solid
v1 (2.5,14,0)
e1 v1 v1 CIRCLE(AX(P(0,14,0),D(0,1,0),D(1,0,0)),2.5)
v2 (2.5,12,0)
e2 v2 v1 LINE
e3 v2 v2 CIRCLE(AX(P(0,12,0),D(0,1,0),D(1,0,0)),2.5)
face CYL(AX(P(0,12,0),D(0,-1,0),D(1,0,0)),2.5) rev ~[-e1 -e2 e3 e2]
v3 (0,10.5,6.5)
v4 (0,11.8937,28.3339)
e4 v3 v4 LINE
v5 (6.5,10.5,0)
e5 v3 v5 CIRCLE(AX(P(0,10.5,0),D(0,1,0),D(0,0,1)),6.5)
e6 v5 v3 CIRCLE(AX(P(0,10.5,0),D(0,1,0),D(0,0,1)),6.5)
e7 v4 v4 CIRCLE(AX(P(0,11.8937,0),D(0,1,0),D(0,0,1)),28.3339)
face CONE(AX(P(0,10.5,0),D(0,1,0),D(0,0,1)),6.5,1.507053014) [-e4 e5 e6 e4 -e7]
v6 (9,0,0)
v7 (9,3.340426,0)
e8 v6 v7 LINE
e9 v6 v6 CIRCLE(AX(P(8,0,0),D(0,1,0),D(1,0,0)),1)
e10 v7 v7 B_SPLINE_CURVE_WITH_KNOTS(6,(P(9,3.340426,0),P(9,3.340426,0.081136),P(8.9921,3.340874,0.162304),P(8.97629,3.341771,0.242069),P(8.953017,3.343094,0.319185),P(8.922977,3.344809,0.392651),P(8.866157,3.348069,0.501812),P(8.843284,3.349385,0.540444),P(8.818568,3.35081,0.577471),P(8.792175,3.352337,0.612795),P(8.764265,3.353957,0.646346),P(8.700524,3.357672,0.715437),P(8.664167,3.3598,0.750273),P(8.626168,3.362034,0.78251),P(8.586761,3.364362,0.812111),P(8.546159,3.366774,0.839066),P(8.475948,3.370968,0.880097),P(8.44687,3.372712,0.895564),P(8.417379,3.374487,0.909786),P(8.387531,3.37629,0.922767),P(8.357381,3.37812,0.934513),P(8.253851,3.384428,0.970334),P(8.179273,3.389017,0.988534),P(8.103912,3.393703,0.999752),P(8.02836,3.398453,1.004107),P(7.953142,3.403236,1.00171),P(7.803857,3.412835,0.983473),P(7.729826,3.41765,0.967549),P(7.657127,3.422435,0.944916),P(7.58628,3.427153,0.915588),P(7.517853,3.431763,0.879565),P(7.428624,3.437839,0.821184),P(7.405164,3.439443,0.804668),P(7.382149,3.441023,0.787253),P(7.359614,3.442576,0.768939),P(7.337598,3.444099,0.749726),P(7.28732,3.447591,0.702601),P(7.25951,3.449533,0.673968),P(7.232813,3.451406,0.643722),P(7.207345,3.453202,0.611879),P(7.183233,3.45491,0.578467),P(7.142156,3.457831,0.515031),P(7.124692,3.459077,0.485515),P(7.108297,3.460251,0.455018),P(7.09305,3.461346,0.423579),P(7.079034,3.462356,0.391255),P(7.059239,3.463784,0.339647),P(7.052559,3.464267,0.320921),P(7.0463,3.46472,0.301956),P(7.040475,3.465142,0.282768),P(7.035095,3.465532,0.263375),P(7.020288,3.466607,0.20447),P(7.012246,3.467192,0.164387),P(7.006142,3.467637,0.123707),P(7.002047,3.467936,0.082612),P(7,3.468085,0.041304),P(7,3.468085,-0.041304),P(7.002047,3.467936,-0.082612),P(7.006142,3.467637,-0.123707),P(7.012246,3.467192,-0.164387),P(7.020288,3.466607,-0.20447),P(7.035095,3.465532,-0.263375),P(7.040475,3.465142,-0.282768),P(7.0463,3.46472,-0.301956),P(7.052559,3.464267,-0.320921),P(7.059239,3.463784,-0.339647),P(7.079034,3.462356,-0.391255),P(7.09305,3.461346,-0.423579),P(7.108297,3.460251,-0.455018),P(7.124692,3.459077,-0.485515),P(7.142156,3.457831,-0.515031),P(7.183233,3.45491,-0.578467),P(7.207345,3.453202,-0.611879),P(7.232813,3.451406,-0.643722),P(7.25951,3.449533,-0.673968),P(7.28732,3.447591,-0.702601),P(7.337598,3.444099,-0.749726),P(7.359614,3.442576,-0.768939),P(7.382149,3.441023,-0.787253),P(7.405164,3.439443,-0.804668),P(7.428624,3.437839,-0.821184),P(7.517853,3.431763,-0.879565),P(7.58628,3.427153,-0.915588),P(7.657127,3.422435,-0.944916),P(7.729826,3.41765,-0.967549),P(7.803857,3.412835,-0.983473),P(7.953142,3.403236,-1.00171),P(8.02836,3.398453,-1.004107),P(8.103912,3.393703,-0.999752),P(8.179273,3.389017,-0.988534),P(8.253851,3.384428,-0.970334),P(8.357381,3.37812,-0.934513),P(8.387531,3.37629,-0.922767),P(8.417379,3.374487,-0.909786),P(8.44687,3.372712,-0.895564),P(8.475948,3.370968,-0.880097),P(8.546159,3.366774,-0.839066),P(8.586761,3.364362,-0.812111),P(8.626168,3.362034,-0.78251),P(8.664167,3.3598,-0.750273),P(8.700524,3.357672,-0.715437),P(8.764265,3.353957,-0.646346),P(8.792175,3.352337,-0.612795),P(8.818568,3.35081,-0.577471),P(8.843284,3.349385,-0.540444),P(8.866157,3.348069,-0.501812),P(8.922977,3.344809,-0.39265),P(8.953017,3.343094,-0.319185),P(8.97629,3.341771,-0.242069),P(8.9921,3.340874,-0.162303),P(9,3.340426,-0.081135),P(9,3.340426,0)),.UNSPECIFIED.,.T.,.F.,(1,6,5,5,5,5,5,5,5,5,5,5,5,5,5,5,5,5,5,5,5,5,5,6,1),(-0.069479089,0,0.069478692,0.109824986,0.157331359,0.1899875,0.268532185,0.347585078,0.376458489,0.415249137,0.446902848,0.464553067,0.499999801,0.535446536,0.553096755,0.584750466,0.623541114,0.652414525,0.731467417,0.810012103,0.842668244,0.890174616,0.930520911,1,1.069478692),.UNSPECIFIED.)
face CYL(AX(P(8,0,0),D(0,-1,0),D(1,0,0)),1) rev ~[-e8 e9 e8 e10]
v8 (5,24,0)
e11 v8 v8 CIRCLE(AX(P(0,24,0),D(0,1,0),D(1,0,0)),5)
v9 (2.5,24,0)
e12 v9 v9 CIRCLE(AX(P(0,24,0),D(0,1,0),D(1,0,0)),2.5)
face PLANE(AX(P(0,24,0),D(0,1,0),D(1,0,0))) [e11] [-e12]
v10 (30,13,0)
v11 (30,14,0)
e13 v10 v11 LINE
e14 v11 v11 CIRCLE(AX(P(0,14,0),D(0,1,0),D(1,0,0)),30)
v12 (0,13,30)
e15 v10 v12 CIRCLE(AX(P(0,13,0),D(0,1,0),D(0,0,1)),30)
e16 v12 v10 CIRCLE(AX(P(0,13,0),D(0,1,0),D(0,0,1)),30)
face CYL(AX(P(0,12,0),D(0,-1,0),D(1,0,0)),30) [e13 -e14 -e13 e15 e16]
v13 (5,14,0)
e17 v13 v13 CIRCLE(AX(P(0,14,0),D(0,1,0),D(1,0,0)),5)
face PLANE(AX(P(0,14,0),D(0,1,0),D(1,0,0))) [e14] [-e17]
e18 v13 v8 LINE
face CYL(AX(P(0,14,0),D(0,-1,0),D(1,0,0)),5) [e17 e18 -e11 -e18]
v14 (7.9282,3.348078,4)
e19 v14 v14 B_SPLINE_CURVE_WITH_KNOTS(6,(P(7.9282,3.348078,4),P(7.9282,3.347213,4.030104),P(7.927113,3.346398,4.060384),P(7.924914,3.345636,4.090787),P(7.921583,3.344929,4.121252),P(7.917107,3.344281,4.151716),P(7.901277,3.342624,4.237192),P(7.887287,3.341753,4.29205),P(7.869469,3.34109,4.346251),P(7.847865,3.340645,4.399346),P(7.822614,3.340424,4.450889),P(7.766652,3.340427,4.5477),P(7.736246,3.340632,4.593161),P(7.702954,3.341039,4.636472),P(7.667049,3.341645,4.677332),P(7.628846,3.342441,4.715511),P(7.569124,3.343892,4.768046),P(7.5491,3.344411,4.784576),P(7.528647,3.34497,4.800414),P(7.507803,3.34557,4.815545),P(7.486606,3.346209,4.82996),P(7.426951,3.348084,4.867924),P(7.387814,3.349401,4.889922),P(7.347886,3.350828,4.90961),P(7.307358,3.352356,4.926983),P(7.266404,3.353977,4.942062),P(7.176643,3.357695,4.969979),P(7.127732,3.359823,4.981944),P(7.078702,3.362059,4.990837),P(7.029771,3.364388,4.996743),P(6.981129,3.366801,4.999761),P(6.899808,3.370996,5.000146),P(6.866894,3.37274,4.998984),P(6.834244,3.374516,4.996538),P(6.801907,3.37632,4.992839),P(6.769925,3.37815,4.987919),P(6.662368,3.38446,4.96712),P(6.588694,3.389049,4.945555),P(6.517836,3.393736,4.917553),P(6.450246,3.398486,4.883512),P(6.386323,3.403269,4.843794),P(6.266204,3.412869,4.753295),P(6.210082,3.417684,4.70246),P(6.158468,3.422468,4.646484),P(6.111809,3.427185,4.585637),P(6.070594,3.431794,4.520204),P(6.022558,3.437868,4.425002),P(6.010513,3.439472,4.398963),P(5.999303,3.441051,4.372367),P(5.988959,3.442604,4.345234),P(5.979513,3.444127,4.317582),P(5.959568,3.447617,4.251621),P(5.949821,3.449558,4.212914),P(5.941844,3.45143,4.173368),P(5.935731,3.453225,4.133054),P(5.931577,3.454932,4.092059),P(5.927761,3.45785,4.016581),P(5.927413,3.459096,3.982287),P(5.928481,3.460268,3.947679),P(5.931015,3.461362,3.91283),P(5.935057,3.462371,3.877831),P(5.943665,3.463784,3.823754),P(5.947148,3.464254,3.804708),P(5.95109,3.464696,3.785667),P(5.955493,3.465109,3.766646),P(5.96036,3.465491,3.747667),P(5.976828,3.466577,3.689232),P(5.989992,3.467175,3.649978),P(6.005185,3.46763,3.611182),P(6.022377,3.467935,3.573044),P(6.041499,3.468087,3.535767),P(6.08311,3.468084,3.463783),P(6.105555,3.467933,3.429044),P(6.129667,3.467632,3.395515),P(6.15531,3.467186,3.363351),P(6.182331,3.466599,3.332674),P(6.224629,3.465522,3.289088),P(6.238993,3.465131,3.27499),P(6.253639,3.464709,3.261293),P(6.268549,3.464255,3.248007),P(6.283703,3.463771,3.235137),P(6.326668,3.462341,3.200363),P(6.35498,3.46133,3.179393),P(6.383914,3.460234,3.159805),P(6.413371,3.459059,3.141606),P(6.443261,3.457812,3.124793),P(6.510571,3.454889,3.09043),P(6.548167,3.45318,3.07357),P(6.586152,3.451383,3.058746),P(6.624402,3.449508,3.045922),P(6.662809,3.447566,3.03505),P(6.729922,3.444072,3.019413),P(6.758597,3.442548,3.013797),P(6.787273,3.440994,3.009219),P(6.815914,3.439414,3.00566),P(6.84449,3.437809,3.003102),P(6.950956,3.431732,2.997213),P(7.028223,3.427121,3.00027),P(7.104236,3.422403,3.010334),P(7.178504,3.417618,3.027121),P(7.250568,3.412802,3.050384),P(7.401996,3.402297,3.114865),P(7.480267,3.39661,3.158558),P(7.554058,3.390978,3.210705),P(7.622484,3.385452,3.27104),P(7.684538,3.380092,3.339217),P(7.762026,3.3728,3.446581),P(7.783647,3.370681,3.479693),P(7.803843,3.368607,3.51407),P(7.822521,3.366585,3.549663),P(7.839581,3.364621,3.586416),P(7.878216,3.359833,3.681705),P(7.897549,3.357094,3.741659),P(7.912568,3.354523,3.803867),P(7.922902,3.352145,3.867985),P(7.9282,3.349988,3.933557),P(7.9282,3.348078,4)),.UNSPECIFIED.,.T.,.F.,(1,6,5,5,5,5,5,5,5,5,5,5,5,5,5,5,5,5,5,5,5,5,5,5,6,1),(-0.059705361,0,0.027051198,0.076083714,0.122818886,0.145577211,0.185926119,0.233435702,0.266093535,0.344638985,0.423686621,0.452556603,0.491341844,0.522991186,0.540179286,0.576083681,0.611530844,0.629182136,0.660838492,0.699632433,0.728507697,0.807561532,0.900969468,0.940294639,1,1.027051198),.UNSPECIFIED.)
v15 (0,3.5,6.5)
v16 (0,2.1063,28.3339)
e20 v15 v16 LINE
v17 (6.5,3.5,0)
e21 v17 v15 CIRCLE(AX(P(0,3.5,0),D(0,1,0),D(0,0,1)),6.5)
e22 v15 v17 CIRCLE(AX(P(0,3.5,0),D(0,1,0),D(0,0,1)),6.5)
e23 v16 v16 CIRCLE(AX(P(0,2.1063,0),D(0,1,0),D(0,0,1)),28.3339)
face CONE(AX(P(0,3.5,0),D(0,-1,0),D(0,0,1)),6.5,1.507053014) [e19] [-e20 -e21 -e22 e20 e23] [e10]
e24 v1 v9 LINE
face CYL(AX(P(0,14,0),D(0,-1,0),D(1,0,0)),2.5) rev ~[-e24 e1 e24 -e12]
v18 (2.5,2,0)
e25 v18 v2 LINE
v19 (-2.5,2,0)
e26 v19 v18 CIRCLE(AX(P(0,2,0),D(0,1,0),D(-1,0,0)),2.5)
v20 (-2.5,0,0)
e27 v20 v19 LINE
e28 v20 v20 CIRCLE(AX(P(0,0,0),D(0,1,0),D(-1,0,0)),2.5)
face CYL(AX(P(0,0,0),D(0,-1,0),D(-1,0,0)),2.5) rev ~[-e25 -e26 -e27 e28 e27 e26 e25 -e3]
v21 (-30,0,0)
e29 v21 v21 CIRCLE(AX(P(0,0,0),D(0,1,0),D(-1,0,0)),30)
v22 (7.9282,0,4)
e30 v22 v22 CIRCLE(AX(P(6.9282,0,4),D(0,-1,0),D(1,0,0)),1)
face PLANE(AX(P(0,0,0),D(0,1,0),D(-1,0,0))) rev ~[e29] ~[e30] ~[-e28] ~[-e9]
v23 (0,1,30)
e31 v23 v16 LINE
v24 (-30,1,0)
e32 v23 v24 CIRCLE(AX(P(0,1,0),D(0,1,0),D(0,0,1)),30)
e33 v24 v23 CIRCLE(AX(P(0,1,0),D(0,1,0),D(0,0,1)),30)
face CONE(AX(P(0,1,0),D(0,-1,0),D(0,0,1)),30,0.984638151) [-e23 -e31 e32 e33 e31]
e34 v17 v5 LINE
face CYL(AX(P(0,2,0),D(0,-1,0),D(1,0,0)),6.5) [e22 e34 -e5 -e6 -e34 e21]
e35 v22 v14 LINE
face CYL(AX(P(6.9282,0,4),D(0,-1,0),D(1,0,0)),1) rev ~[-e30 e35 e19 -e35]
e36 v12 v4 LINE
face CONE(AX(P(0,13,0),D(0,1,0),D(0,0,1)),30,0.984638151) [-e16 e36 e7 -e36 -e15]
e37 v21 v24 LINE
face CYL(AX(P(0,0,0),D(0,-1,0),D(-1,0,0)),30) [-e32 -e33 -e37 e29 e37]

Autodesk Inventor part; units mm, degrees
ref_plane "YZ Plane" through (0, 0, 0) normal (1, 0, 0) x (0, 1, 0)
ref_plane "XZ Plane" through (0, 0, 0) normal (0, 1, 0) x (-1, 0, 0)
ref_plane "XY Plane" through (0, 0, 0) normal (0, 0, 1) x (1, 0, 0)
sketch "Sketch1" plane through (0, 0, 0) normal (0, 1, 0) x (-1, 0, 0)
  circle A0 centre (0, 0) radius 30
  circle A1 centre (0, 0) radius 2.5
  dimension "d0" = 60
  dimension "d1" = 5
extrude "Extrusion1" add sketch "Sketch1" along normal blind 2
sketch "Sketch2" plane through (0, 2, 0) normal (0, 1, 0) x (1, 0, 0)
  circle A0 centre (0, 0) radius 2.5
  circle A1 centre (0, 0) radius 6.5
  dimension "d4" = 13
extrude "Extrusion2" add sketch "Sketch2" along normal blind 10
sketch "Sketch3" plane through (0, 12, 0) normal (0, 1, 0) x (1, 0, 0)
  circle A0 centre (0, 0) radius 30
  circle A1 centre (0, 0) radius 2.5
extrude "Extrusion3" add sketch "Sketch3" along normal blind 2
sketch "Sketch4" plane through (0, 0, 0) normal (1, 0, 0) x (0, 1, 0)
  line L0 (2, 6.5) -> (12, 6.5) projected
  line L1 (2, 6.5) -> (3.5, 6.5)
  line L2 (2, -30) -> (2, 30) projected
  line L3 (3.5, 6.5) -> (2, 30)
  line L4 (12, 6.5) -> (10.5, 6.5)
  line L5 (12, -30) -> (12, 30) projected
  line L6 (10.5, 6.5) -> (12, 30)
  line L7 (-2.8, 0) -> (16.8, 0) projected
  point P0 (0, 0)
  dimension "d9" = 1.5
  dimension "d10" = 1.5
revolve "Revolution1" add sketch "Sketch4" angle 360 about axis through (0, -10, 0) along (0, 1, 0) contours L2 L3 L0 | L6 L5 L0
sketch "Sketch6" plane through (0, 0, 0) normal (1, 0, 0) x (0, 1, 0)
  line L0 (0, -30) -> (0, 30) projected
  line L1 (0, 30) -> (1, 30)
  line L2 (0, 30) -> (2, 30) projected
  line L3 (1, 30) -> (2.1063, 28.3339)
  line L4 (2, 30) -> (3.5, 6.5) projected
  line L5 (2.1063, 28.3339) -> (1, 28.3339)
  line L6 (1, 28.3339) -> (1, 30)
  line L7 (14, -30) -> (14, 30) projected
  line L8 (14, 30) -> (13, 30)
  line L9 (12, 30) -> (14, 30) projected
  line L10 (13, 30) -> (11.8937, 28.3339)
  line L11 (10.5, 6.5) -> (12, 30) projected
  line L12 (11.8937, 28.3339) -> (14, 28.3339)
  line L13 (14, 28.3339) -> (14, 30)
  line L14 (13, 30) -> (13, 28.3339)
  line L15 (-2.8, 0) -> (16.8, 0) projected
  point P0 (0, 0)
  dimension "d12" = 1
  dimension "d13" = 2
revolve "Revolution2" cut sketch "Sketch6" angle 360 about axis through (0, -10, 0) along (0, 1, 0) contours L2 L4 L3 | L10 L11 L9
sketch "Sketch7" plane through (0, 14, 0) normal (0, 1, 0) x (1, 0, 0)
  circle A0 centre (0, 0) radius 2.5
  circle A1 centre (0, 0) radius 5
  dimension "d15" = 10
extrude "Extrusion4" add sketch "Sketch7" along normal blind 10
ref_plane "Work Plane1" through (0, 7, 0) normal (0, 1, 0) x (1, 0, 0)
sketch "Sketch8" plane through (0, 0, 0) normal (0, -1, 0) x (1, 0, 0)
  line L0 (0, 0) -> (8, 0)
  circle A0 centre (8, 0) radius 1
  circle A1 centre (6.9282, 4) radius 1
  dimension "d18" = 8
  dimension "d21" = 30
  dimension "d25" = 2
extrude "Extrusion5" cut sketch "Sketch8" against normal up to surface
properties part number "spool"
